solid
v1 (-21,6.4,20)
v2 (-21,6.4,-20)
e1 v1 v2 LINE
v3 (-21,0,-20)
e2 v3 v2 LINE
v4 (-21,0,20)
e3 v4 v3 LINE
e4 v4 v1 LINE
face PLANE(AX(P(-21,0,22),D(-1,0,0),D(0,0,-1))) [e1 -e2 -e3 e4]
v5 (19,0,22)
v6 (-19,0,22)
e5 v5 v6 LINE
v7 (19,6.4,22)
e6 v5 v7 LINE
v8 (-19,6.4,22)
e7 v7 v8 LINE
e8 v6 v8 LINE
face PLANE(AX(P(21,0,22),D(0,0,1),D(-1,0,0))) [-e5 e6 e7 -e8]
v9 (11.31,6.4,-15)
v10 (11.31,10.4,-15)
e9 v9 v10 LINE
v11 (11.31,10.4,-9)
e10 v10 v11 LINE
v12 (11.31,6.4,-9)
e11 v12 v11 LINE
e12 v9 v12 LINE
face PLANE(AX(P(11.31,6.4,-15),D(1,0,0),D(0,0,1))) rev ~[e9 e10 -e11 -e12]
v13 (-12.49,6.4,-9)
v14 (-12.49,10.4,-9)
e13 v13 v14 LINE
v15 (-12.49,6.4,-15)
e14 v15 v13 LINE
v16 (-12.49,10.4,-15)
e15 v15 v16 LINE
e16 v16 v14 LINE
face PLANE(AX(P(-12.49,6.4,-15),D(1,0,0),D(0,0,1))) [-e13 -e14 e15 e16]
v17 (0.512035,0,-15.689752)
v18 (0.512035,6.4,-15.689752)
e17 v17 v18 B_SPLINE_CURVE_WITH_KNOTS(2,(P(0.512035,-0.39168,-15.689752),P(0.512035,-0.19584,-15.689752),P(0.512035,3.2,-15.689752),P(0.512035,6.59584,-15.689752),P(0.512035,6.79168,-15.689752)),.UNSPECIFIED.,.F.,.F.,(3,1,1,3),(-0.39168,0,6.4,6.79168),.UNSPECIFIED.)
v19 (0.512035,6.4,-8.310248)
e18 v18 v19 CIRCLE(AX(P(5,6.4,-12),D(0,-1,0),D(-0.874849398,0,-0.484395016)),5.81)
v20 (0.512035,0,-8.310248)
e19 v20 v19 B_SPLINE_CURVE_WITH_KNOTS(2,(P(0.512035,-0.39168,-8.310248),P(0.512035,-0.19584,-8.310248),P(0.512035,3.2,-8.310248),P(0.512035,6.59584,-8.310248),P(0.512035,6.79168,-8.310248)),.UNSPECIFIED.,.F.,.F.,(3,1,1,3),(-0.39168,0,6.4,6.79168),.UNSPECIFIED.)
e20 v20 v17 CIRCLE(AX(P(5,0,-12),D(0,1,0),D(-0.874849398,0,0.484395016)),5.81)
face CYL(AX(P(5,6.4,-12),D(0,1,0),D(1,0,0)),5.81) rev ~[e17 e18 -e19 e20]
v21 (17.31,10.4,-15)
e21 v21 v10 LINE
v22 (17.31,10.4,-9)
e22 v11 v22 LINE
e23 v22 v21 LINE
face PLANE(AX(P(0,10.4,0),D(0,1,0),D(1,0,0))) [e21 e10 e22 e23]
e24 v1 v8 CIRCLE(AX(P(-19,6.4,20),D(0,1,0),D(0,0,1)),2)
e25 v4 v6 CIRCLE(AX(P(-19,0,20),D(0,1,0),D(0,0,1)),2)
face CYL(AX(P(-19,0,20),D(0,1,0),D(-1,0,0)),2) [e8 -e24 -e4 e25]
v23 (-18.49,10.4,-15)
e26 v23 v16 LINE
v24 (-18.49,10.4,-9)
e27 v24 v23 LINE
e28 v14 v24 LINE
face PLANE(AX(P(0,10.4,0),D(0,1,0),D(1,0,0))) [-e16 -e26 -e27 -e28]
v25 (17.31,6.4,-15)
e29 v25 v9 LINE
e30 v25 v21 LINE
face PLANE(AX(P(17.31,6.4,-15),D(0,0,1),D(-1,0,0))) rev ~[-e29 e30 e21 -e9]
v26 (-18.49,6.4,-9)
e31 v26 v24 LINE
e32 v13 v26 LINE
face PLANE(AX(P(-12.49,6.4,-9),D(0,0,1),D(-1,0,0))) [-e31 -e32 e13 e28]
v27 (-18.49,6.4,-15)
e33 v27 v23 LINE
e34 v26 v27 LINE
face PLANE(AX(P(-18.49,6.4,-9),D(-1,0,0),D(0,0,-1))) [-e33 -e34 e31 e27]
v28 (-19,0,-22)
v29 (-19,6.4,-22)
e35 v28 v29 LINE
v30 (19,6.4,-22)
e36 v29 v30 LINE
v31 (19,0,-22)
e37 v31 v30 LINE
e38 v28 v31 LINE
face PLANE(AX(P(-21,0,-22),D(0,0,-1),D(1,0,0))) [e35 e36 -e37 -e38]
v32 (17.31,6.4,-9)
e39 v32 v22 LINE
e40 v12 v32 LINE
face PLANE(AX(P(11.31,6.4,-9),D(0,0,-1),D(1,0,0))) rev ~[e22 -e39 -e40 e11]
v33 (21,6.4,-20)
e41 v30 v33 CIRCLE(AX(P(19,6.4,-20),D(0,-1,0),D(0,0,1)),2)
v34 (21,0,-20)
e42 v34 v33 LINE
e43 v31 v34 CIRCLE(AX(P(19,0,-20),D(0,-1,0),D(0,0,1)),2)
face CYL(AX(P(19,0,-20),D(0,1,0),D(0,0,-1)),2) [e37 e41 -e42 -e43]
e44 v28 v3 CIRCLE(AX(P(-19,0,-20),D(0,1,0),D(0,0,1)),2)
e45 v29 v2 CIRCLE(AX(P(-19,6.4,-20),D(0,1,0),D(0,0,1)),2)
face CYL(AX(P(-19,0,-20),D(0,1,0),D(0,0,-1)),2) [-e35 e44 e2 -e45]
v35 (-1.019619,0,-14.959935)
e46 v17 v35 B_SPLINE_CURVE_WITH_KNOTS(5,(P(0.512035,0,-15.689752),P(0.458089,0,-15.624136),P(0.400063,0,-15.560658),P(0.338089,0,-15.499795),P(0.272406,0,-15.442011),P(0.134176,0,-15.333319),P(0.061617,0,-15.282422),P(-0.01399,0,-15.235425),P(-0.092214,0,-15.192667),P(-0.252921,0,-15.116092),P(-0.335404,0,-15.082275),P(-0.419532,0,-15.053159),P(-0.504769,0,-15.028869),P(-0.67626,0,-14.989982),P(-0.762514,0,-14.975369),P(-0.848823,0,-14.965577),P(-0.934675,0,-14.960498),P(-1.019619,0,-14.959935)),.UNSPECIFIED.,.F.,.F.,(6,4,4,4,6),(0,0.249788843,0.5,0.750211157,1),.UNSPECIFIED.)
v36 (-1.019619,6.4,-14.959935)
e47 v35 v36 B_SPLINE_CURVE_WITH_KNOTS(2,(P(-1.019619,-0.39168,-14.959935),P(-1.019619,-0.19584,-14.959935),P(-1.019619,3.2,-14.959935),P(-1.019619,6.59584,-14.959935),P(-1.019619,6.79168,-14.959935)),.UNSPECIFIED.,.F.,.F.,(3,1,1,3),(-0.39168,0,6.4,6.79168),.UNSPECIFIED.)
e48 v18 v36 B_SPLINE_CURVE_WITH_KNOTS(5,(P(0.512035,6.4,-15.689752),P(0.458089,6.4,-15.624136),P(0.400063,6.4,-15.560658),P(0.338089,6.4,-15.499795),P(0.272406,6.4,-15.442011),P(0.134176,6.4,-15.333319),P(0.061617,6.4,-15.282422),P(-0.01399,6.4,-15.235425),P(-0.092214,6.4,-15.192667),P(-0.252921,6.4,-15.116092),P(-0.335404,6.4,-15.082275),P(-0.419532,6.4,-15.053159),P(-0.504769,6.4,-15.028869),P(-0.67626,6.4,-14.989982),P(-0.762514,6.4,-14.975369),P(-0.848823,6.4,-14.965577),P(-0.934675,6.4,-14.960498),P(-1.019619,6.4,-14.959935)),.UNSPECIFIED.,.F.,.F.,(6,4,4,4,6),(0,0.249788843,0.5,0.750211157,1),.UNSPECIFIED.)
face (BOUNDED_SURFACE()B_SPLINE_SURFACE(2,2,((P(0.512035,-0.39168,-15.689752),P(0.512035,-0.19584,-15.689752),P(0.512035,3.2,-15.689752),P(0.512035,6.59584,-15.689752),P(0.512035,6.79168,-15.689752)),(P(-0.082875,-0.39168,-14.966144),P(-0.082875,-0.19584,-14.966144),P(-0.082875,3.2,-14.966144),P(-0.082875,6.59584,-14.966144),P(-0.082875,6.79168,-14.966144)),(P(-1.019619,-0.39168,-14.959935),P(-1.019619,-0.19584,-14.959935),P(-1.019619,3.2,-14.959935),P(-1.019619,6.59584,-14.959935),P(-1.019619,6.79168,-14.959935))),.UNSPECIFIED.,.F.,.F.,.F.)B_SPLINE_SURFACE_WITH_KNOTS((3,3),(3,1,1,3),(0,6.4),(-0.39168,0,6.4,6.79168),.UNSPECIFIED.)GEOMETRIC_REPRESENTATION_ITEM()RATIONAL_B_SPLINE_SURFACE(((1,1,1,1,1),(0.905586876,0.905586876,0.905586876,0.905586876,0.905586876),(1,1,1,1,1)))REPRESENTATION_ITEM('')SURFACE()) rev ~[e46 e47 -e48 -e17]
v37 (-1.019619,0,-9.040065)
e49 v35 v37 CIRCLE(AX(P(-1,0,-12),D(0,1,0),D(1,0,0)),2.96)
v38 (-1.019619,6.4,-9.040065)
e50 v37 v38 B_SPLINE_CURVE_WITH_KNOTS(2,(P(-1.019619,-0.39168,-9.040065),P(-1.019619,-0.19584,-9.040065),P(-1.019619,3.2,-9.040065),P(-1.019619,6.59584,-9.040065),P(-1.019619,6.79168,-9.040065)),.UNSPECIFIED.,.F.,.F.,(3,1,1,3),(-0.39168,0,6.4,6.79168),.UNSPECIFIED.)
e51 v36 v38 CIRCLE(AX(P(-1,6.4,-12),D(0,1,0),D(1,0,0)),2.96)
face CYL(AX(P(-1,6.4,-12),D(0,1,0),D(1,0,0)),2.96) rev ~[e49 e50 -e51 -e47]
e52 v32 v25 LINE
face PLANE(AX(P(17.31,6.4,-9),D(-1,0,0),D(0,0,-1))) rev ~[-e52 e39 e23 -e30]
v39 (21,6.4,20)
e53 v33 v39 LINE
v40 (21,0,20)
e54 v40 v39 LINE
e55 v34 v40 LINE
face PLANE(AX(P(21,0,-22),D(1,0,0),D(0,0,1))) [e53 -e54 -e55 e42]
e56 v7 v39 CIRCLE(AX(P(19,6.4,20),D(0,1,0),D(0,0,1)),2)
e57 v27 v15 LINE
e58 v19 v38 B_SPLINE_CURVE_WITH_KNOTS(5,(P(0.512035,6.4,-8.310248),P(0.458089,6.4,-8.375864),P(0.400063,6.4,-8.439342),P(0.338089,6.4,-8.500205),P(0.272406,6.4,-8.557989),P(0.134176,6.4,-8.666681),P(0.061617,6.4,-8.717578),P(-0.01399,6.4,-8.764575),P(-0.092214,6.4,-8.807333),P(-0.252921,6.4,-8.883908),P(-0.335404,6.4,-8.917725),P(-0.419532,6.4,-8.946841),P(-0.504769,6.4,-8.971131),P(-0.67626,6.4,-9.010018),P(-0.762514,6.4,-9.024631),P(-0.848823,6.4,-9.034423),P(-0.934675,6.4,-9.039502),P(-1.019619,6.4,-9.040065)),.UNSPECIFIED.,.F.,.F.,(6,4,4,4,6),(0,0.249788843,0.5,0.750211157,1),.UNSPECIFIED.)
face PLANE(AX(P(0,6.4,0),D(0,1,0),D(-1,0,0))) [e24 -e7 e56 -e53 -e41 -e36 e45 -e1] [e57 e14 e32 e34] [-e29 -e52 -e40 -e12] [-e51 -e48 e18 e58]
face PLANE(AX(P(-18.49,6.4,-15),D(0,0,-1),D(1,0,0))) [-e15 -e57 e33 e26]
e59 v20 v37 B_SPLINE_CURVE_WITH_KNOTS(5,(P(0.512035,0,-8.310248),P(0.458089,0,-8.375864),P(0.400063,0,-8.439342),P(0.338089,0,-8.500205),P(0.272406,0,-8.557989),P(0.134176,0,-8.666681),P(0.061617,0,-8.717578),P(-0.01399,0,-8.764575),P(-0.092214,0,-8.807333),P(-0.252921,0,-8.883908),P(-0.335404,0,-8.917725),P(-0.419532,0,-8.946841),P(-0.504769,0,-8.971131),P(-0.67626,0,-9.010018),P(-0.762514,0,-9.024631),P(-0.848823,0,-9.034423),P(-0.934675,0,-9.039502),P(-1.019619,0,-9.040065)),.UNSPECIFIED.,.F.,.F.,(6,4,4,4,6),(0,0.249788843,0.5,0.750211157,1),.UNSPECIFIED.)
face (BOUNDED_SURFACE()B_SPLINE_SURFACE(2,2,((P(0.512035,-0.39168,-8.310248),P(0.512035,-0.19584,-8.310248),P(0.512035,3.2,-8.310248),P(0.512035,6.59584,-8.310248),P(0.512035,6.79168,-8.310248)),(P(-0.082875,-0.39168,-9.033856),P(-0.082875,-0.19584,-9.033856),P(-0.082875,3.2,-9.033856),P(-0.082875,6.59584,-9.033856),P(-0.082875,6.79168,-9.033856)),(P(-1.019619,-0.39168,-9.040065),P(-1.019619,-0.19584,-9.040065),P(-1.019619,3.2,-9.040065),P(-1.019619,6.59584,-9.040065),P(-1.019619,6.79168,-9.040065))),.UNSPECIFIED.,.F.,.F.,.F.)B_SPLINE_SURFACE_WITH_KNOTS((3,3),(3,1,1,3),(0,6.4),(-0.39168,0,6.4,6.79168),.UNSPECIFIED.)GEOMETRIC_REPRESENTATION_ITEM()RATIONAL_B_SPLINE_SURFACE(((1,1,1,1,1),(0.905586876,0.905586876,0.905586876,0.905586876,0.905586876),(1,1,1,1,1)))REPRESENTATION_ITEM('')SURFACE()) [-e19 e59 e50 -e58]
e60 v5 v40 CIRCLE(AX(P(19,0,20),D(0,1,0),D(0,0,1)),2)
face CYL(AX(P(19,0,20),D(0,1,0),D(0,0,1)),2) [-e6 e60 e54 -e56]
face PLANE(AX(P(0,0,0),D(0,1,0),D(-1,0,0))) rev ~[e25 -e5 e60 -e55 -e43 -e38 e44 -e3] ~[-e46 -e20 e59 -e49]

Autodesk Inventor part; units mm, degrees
ref_plane "YZ Plane" through (0, 0, 0) normal (1, 0, 0) x (0, 1, 0)
ref_plane "XZ Plane" through (0, 0, 0) normal (0, 1, 0) x (-1, 0, 0)
ref_plane "XY Plane" through (0, 0, 0) normal (0, 0, 1) x (1, 0, 0)
sketch "Sketch1" plane through (0, 0, 0) normal (0, 1, 0) x (-1, 0, 0)
  line L0 (-21, 22) -> (21, 22)
  line L1 (21, 22) -> (21, -22)
  line L2 (21, -22) -> (-21, -22)
  line L3 (-21, -22) -> (-21, 22)
  line L4 (-21, 22) -> (21, -22) construction
  line L5 (21, 22) -> (-21, -22) construction
  point P0 (0, 0)
  dimension "d0" = 42
  dimension "d1" = 44
extrude "wall2" add sketch "Sketch1" along normal blind 6.4
sketch "Sketch7" plane through (0, 6.4, 0) normal (0, 1, 0) x (1, 0, 0)
  line L0 (5, -22) -> (5, 22) construction
  line L1 (21, 22) -> (-21, 22) projected
  line L2 (-21, -22) -> (21, -22) projected
  line L3 (-21, 12) -> (21, 12) construction
  line L4 (21, -22) -> (21, 22) projected
  line L5 (-21, 22) -> (-21, -22) projected
  circle A0 centre (5, 12) radius 5.81
  point P0 (0, 0)
  dimension "d74" = 34
  dimension "d75" = 26
  dimension "d76" = 11.62
extrude "bigcircle" cut sketch "Sketch7" against normal blind 6.4 contours A0
sketch "Sketch8" plane through (0, 6.4, 0) normal (0, 1, 0) x (1, 0, 0)
  line L0 (-21, -22) -> (-21, 22) projected
  line L1 (-21, 12) -> (21, 12) construction
  line L2 (21, 22) -> (21, -22) projected
  line L3 (5, 22) -> (5, -22) construction
  line L4 (21, -22) -> (21, 22) projected
  line L5 (21, 22) -> (-21, 22) projected
  line L6 (-21, -22) -> (21, -22) projected
  circle A0 centre (-1, 12) radius 2.96
  point P0 (0, 0)
  dimension "d81" = 26
  dimension "d82" = 34
  dimension "d83" = 5.92
  dimension "d84" = 6
extrude "smallcircle" cut sketch "Sketch8" against normal blind 6.4 contours A0
fillet "Fillet4" radius 2 2 edges at (-0.0829, 3.2, -9.1857) (-0.0829, 3.2, -14.8143)
fillet_without_effect "Fillet5"
fillet "Fillet6" radius 2 1 edges at (-21, 3.2, -22)
fillet "Fillet7" radius 2 1 edges at (21, 3.2, -22)
fillet "Fillet8" radius 2 1 edges at (-21, 3.2, 22)
fillet "Fillet9" radius 2 1 edges at (21, 3.2, 22)
sketch "Sketch9" plane through (0, 6.4, 0) normal (0, 1, 0) x (1, 0, 0)
  line L0 (11.31, 17.1525) -> (11.31, -6.1616) construction
  line L1 (10.81, 14.2171) -> (10.81, 9.0836) construction
  arc A0 (0.512, 8.3102) -> (0.512, 15.6898) centre (5, 12) ccw projected
  line L2 (-21, 12) -> (18.6779, 12) construction
  line L3 (11.31, 9) -> (17.31, 9)
  line L4 (17.31, 9) -> (17.31, 15)
  line L5 (17.31, 15) -> (11.31, 15)
  line L6 (11.31, 15) -> (11.31, 9)
  line L7 (11.31, 9) -> (17.31, 15) construction
  line L8 (17.31, 9) -> (11.31, 15) construction
  line L9 (-21, 20) -> (-21, -20) projected
  line L10 (-18.49, 15) -> (-12.49, 15)
  line L11 (-12.49, 15) -> (-12.49, 9)
  line L12 (-12.49, 9) -> (-18.49, 9)
  line L13 (-18.49, 9) -> (-18.49, 15)
  line L14 (-18.49, 15) -> (-12.49, 9) construction
  line L15 (-12.49, 15) -> (-18.49, 9) construction
  point P0 (0, 0)
  point P1 (14.31, 12)
  point P2 (-15.49, 12)
  dimension "d93" = 0.5
  dimension "d94" = 6
  dimension "d95" = 23.3
extrude "Extrusion7" add sketch "Sketch9" along normal blind 4
equation "\"d0\" = wallw"
equation "\"d1\" = wallh"
equation "\"d72\" = wall2_thick"
equation "\"d74\" = distancefrombottom"
equation "\"d75\" = distancefromleft"
equation "\"d76\" = servobigcircledia"
equation "\"d79\" = wall2_thick"
equation "\"d81\" = distancefromleft"
equation "\"d82\" = distancefrombottom"
equation "\"d83\" = servosmallcircledia"
equation "\"d85\" = wall2_thick"
equation "\"d89\" = cornerrad"
equation "\"d90\" = cornerrad"
equation "\"d91\" = cornerrad"
equation "\"d92\" = cornerrad"
equation "\"d94\" = servomountsquare"
equation "\"d96\" = servomounth"
equation "\"printer3dtolerance\" = 0.12"
equation "\"wallw\" = 42"
equation "\"wallh\" = 44"
equation "\"cornerrad\" = 2"
equation "\"baseextra\" = 2"
equation "\"wall1_thick\" = 8"
equation "\"wall2_thick\" = 6.4"
equation "\"wall3_thick\" = 4"
equation "\"wall1slot\" = 8.12"
equation "\"wall2slot\" = 6.52"
equation "\"wall3slot\" = 4.12"
equation "\"gap2\" = 28"
equation "\"baseh\" = 79.12"
equation "\"basew\" = 44"
equation "\"base_thick\" = 6"
equation "\"base_slots_depth\" = 4"
equation "\"servomounth\" = 4"
equation "\"servosmallcircledia\" = 5.92"
equation "\"servomountsquare\" = 6"
equation "\"servobigcircledia\" = 11.62"
equation "\"servo9gw\" = 22.8"
equation "\"distancefromleft\" = 26"
equation "\"servopolygonl\" = 5.92"
equation "\"servopolygonr\" = 6.12"
equation "\"distancefrombottom\" = 34"
equation "\"d49\" = distancefrombottom"
equation "\"adapterh\" = 16"
equation "\"wall3slotd\" = 2"
equation "\"adapterw\" = 32"
equation "\"wall3slotd_1\" = 2"
equation "\"wall3slotw\" = 36"
properties part number "wall-middle" material "Wood (Oak)"
